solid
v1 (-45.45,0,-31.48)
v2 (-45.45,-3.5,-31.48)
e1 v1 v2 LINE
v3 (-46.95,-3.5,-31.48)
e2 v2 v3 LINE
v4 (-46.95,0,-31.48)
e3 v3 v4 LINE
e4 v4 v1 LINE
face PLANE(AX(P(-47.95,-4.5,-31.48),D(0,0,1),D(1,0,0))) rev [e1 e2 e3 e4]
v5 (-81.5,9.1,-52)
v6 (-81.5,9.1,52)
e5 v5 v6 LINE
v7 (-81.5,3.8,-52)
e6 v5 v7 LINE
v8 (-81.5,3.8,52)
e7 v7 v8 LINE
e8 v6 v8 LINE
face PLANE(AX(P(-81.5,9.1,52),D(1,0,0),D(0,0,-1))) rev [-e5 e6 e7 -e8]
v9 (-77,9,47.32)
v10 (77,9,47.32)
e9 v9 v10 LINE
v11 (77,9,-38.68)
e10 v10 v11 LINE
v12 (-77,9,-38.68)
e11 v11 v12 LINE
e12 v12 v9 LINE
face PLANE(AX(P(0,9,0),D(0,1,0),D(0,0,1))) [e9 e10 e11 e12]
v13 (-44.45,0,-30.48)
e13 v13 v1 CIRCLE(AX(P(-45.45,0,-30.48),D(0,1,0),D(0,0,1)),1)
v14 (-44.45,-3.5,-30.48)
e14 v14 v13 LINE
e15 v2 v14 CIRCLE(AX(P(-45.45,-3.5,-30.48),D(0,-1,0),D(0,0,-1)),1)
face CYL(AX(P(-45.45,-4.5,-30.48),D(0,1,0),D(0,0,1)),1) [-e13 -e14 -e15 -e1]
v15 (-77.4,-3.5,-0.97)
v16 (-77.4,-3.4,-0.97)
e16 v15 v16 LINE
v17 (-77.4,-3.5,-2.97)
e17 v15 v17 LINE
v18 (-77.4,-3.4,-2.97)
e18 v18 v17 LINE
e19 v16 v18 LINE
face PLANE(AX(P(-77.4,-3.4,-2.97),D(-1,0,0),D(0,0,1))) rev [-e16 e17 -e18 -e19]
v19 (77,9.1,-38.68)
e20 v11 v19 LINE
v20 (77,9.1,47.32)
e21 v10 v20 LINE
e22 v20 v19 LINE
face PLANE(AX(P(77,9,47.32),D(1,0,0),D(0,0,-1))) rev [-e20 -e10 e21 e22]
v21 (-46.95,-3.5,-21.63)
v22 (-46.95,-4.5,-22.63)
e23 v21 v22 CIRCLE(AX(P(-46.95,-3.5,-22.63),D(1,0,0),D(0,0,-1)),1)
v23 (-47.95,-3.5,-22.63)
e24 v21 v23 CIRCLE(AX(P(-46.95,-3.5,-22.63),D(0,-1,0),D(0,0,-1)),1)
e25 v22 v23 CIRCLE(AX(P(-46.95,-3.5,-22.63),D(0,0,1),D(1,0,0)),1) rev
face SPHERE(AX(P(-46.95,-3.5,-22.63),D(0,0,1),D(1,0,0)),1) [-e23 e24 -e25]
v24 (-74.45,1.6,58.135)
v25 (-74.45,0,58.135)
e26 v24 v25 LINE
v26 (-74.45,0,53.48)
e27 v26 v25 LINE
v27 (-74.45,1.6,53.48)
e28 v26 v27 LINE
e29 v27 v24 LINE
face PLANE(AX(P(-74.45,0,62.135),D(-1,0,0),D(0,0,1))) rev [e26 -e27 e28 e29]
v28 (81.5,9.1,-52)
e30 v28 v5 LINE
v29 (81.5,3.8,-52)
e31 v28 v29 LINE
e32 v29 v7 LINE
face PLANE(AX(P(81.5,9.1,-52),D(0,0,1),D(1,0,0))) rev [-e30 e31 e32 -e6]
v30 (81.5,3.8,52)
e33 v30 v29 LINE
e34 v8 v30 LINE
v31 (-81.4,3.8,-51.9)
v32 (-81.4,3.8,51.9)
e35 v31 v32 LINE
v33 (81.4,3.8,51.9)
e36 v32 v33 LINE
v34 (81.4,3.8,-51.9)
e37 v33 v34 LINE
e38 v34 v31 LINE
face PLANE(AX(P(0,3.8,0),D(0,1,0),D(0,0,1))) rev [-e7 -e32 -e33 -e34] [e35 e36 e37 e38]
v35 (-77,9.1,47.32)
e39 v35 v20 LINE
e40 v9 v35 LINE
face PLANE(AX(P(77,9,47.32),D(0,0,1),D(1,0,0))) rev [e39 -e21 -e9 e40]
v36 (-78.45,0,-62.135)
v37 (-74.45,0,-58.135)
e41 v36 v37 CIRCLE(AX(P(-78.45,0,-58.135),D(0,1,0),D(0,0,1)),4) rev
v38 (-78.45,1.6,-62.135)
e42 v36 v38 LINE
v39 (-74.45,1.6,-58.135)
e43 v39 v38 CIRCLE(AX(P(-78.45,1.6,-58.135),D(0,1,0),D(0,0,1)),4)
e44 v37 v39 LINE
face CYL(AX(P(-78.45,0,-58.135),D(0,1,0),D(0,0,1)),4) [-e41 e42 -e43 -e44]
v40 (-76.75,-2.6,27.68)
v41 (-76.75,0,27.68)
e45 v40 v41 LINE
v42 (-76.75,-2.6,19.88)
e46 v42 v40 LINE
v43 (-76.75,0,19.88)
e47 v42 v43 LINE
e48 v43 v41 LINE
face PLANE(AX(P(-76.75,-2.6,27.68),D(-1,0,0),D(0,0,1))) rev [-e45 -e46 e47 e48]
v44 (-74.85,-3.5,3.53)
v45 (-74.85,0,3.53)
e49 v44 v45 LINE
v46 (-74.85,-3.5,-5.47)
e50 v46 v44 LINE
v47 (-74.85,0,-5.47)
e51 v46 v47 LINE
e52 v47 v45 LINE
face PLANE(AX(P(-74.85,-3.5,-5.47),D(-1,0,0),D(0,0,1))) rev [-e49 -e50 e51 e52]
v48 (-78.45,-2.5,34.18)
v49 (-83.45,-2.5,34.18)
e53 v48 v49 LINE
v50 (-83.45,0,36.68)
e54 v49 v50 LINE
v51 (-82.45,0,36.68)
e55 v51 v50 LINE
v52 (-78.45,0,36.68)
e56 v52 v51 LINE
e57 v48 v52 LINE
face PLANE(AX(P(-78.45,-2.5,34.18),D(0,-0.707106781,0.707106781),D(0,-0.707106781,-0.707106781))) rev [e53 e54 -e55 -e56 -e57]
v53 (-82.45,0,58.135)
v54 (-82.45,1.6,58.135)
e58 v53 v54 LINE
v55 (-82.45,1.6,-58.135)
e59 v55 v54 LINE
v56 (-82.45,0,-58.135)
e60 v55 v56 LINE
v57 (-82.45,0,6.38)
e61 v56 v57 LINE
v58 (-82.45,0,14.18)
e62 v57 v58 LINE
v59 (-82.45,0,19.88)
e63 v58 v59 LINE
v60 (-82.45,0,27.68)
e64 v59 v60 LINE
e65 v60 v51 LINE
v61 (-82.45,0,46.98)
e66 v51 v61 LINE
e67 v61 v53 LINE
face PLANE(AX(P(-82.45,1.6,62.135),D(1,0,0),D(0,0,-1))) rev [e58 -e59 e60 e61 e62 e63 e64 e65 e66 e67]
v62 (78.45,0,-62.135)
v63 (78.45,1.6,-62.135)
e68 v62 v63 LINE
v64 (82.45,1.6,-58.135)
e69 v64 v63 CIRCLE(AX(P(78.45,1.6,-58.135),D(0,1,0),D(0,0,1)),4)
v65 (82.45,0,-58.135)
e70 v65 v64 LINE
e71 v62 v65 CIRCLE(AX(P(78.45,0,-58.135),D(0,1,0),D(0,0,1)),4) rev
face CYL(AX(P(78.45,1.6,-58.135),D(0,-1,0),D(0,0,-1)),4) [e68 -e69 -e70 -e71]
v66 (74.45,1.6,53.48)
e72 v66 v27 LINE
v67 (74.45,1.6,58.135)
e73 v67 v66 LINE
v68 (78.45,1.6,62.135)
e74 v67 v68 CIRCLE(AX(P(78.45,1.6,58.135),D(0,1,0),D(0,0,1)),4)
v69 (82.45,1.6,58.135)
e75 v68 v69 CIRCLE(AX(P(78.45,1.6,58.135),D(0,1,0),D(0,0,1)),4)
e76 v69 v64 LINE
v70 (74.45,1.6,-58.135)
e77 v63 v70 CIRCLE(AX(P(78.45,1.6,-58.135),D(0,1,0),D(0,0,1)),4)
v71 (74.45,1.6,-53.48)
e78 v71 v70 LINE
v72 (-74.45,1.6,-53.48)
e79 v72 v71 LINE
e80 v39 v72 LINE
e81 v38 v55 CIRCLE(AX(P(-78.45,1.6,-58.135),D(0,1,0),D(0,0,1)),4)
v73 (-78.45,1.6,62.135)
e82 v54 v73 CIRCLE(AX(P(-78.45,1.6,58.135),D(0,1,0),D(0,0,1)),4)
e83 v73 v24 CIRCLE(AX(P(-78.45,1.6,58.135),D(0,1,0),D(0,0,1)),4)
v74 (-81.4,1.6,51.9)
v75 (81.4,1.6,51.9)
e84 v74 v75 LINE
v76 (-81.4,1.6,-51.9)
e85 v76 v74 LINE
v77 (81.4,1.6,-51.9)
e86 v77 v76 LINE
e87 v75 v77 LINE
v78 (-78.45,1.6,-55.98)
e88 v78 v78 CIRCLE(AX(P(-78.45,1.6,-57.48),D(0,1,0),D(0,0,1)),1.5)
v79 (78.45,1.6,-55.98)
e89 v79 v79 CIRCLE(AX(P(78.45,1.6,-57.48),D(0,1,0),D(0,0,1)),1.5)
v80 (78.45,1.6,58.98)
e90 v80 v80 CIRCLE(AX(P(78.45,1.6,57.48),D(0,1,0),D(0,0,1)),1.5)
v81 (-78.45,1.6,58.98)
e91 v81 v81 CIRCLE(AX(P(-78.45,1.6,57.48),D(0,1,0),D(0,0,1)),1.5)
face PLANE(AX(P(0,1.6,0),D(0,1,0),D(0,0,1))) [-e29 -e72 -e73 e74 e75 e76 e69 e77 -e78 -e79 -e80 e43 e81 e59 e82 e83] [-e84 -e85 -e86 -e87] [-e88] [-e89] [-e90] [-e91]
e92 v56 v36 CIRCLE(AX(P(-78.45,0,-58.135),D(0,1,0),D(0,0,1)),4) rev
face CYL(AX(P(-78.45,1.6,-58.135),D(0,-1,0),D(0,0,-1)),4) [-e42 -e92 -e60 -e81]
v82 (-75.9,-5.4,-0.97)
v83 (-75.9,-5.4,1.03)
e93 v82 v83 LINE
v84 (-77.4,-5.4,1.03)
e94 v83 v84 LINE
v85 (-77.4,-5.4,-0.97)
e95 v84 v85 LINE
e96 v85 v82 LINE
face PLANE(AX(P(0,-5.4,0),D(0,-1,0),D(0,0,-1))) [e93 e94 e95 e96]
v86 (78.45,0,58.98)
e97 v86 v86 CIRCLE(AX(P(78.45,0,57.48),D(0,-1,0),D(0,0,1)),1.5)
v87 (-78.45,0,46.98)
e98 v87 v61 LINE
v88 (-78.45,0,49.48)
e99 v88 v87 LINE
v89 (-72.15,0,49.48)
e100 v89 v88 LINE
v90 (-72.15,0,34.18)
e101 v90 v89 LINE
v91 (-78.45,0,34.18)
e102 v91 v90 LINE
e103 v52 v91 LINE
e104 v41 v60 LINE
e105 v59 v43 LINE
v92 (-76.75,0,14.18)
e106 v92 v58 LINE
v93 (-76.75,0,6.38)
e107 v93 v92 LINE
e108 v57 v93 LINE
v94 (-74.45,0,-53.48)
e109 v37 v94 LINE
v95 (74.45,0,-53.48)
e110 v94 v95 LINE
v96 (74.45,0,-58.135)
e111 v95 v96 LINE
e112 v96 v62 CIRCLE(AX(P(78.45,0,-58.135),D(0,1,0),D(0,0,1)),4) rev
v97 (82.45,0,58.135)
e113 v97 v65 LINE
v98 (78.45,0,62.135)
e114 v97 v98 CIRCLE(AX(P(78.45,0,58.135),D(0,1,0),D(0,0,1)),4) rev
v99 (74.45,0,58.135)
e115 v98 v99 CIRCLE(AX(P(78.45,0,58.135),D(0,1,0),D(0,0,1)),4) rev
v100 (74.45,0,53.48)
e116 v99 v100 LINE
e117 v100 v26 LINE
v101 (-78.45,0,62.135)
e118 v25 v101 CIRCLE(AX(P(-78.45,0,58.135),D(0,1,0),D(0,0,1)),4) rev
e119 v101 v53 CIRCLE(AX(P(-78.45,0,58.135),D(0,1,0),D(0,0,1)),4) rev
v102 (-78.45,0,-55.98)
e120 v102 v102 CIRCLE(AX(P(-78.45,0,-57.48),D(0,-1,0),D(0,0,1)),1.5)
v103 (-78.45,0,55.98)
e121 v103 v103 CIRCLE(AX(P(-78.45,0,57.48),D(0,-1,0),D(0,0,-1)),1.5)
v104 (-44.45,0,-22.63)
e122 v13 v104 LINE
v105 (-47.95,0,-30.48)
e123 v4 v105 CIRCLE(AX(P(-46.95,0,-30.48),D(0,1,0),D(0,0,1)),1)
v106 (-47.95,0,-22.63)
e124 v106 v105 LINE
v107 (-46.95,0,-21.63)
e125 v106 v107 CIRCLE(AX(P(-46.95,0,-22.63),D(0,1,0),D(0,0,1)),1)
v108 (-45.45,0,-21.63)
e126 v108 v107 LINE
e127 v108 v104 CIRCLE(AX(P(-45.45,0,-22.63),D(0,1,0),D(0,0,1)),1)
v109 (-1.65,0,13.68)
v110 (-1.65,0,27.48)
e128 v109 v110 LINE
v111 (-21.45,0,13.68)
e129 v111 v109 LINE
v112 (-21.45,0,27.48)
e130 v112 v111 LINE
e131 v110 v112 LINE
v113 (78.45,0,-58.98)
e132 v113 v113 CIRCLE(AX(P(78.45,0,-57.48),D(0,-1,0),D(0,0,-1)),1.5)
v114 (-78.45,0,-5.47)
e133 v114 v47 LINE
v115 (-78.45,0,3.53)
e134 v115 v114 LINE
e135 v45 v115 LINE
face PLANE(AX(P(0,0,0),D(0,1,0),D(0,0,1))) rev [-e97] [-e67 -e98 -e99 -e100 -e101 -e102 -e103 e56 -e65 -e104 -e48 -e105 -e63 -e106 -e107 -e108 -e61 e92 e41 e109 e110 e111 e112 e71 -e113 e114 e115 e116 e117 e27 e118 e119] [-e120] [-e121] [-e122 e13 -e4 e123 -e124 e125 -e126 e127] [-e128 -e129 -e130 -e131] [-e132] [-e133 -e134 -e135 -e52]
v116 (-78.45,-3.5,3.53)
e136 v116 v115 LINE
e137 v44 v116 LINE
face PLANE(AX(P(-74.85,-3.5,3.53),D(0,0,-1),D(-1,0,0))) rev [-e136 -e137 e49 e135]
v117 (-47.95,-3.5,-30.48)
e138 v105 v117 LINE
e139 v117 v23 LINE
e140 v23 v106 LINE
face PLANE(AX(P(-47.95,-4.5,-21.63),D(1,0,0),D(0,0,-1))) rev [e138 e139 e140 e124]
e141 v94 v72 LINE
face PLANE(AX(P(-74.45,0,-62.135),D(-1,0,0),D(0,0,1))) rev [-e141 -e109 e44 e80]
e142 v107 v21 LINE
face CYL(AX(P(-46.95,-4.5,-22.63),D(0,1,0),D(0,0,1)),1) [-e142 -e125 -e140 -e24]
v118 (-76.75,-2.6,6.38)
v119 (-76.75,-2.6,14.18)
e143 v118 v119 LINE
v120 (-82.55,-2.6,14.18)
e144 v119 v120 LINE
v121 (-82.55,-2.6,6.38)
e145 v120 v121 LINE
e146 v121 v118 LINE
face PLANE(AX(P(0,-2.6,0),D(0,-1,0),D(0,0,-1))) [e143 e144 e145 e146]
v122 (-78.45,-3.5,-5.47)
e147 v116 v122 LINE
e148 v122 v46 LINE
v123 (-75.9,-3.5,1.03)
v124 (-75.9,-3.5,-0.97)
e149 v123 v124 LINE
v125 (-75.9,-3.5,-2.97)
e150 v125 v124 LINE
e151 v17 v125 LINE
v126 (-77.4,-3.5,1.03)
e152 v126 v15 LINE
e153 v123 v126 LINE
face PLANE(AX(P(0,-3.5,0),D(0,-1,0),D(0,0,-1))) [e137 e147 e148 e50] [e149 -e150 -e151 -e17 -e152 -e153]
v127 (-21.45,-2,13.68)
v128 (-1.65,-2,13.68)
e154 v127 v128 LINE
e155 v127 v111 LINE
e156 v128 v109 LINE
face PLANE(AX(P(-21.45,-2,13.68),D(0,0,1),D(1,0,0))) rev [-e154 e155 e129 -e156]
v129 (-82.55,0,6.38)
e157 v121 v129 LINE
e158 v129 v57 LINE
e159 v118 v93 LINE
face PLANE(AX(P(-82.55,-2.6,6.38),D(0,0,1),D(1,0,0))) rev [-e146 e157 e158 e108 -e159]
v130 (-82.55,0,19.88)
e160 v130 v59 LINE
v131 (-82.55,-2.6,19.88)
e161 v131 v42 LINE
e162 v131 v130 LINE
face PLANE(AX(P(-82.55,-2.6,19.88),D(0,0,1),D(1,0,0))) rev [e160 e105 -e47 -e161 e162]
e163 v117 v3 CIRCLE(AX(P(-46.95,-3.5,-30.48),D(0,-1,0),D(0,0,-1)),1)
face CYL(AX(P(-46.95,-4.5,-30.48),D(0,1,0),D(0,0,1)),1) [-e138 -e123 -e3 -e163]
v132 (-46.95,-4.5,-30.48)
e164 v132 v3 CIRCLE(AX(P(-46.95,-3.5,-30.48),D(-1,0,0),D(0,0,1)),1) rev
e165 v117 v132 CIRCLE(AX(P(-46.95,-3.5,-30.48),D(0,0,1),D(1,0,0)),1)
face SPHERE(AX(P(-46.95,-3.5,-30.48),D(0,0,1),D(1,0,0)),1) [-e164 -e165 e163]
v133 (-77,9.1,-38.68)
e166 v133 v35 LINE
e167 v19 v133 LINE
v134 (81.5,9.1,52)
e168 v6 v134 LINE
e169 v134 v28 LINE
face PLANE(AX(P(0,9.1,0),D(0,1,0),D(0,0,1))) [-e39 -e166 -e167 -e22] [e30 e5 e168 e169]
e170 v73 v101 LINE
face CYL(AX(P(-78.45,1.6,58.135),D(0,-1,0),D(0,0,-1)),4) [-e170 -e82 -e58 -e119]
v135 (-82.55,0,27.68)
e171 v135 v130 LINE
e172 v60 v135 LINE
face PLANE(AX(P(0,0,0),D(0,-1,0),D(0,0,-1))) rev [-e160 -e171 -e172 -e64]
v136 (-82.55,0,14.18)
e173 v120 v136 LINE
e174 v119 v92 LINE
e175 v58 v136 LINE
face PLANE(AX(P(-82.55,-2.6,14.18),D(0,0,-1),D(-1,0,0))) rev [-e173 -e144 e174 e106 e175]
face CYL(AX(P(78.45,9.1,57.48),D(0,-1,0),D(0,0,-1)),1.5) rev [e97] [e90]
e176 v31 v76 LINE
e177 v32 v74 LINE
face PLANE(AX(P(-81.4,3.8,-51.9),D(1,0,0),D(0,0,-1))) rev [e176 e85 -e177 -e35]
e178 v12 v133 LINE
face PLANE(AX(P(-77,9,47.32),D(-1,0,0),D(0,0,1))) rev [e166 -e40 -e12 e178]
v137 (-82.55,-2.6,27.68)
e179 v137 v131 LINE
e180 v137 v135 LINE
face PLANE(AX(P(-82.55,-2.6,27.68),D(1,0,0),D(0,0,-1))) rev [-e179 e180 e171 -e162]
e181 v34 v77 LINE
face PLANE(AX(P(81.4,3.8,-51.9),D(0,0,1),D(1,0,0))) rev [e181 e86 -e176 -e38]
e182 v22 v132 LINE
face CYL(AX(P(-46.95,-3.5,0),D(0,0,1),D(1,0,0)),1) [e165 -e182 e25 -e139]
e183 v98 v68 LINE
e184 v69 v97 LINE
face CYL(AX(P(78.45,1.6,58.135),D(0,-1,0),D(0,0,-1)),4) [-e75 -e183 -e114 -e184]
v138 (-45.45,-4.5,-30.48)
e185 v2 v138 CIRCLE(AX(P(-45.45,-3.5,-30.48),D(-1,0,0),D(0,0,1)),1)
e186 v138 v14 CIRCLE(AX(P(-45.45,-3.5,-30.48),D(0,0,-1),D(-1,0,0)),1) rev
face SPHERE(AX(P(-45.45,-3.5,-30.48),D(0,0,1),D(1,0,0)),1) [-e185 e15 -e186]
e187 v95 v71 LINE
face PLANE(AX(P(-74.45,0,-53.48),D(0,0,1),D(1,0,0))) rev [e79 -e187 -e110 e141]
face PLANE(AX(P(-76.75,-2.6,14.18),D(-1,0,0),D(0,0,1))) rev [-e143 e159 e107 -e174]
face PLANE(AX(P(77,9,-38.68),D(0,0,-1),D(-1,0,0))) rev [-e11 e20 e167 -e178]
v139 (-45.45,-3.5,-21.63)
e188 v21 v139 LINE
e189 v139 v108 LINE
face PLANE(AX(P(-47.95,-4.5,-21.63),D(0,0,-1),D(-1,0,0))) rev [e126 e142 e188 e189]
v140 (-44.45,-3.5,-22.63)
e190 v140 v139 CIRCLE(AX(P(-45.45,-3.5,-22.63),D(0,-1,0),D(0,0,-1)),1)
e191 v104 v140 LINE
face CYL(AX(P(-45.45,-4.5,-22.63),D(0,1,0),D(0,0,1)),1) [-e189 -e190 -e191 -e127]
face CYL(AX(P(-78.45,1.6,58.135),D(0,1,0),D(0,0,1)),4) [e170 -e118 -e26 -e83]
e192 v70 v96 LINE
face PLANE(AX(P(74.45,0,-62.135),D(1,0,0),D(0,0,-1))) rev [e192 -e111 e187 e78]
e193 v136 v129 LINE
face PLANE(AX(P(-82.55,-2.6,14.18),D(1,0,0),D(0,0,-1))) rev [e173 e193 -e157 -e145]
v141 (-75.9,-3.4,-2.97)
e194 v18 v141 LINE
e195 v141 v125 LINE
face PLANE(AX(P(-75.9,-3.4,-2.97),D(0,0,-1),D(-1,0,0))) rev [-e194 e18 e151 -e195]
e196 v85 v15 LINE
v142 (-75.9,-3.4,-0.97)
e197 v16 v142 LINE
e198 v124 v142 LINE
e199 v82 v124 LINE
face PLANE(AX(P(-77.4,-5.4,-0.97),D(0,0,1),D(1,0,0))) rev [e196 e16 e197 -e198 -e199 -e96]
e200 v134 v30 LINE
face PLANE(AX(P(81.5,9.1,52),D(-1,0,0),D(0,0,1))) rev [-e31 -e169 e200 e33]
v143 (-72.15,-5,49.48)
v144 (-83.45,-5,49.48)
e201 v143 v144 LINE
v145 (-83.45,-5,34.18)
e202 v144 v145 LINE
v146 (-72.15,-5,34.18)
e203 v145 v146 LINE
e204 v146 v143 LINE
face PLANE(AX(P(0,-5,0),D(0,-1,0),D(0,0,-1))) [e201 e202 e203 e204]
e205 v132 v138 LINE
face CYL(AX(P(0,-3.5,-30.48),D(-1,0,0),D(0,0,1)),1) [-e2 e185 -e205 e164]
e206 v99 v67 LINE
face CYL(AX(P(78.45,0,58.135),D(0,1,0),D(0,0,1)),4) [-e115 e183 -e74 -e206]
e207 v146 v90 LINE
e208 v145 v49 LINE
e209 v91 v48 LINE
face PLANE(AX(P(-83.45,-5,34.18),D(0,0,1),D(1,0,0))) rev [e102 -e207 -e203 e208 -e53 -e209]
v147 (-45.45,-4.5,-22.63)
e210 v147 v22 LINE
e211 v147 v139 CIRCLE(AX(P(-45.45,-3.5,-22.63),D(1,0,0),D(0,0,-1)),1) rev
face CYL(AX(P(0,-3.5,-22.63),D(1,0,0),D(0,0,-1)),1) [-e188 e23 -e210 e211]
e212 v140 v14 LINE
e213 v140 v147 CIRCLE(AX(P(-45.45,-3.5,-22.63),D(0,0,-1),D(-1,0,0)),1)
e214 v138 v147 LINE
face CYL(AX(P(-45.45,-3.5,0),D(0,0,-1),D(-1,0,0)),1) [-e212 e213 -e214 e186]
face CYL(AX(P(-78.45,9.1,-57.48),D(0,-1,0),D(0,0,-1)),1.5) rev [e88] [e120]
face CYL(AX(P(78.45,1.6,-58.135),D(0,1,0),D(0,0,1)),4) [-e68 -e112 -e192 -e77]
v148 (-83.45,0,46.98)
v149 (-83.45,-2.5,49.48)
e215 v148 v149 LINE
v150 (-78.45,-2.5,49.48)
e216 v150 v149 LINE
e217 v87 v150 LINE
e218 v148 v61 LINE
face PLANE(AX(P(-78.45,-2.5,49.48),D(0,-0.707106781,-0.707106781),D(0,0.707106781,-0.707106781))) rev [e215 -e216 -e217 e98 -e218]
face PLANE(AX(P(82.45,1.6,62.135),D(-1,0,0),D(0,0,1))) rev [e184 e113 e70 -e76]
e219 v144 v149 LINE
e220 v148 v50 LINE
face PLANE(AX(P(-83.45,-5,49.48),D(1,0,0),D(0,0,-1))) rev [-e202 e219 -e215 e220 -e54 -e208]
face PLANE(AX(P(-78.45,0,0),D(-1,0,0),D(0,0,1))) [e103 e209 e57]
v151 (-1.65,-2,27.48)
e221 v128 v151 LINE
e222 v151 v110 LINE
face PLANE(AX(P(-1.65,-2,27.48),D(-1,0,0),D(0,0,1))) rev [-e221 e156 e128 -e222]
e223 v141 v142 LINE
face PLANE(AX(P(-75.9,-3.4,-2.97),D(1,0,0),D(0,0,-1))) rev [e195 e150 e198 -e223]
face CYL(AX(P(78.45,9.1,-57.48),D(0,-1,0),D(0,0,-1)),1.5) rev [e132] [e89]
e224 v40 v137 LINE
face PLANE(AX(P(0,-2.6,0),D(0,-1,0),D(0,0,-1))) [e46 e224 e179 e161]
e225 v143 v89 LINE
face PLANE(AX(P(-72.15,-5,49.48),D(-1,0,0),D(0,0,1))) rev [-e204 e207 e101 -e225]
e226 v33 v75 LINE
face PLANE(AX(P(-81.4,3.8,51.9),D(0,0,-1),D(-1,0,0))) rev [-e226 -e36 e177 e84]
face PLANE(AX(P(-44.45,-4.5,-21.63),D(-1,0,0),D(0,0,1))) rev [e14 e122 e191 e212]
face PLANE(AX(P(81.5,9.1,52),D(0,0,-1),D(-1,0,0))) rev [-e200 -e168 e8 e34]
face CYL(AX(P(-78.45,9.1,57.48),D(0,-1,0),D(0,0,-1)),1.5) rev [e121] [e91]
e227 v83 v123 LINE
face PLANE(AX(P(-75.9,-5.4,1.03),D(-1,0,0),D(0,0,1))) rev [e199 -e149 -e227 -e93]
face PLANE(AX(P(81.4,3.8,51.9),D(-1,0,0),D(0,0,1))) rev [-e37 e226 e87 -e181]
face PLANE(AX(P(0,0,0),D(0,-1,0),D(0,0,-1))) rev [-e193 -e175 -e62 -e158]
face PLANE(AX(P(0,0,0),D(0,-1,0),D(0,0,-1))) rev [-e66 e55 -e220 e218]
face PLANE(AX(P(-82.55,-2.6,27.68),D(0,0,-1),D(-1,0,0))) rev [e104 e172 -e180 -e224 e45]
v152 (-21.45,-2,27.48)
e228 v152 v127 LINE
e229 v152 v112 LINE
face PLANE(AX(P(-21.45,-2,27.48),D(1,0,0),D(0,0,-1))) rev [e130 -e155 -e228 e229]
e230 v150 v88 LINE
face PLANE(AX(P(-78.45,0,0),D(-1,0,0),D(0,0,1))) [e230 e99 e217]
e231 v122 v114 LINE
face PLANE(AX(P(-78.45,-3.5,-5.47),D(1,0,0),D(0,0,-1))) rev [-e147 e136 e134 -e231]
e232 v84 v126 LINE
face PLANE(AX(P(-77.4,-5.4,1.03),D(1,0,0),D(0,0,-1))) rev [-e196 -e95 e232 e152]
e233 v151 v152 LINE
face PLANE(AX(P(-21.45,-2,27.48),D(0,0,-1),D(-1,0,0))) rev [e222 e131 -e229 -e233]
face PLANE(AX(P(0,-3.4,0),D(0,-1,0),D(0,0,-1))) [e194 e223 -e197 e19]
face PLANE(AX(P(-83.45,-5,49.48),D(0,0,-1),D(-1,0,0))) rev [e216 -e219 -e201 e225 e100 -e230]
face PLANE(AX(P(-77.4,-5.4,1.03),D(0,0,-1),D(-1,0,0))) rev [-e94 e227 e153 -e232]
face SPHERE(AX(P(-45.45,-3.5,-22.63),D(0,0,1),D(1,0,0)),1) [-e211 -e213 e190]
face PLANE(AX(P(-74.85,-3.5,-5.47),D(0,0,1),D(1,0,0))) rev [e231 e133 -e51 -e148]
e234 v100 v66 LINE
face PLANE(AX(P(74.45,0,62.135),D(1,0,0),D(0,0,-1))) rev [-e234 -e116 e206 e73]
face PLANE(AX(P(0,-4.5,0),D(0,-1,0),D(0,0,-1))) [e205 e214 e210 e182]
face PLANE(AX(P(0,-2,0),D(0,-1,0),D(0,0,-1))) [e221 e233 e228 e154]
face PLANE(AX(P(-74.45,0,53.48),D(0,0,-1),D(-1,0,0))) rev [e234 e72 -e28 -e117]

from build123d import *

# Parameters (mm, degrees)
SKETCH_1_W          = 164.9
SKETCH_1_H          = 124.27
EXTRUDE_2_DEPTH     = 1.6
SKETCH_2_W          = 148.9
SKETCH_2_H          = 8.655
CUT_EXTRUDE_1_DEPTH = 104.253671726
SKETCH_3_W          = 163
SKETCH_3_H          = 104
EXTRUDE_4_DEPTH     = 7.5
SKETCH_4_W          = 11.3
SKETCH_4_H          = 15.3
EXTRUDE_5_DEPTH     = 5
SKETCH_6_W          = 3.5
SKETCH_6_H          = 9.85
EXTRUDE_6_DEPTH     = 4.5
FILLET_1_R          = 1
FILLET_2_R          = 1
SKETCH_7_R          = 1.5
CUT_EXTRUDE_3_DEPTH = 105.438837245
FILLET_3_R          = 4
SKETCH_9_W          = 154
SKETCH_9_H          = 86
CUT_EXTRUDE_5_DEPTH = 0.1
CUT_EXTRUDE_6_DEPTH = 5
SKETCH_11_W         = 5.8
SKETCH_11_H         = 7.8
EXTRUDE_7_DEPTH     = 2.6
SKETCH_12_W         = 3.6
SKETCH_12_H         = 9
EXTRUDE_8_DEPTH     = 3.5
SKETCH_13_W         = 1.5
SKETCH_13_H         = 4
CUT_EXTRUDE_7_DEPTH = 0.1
SKETCH_14_W         = 1.5
SKETCH_14_H         = 2
EXTRUDE_9_DEPTH     = 2
SKETCH_15_W         = 19.8
SKETCH_15_H         = 13.8
EXTRUDE_10_DEPTH    = 2
SKETCH_16_W         = 163
SKETCH_16_H         = 104
SKETCH_16_W_2       = 162.8
SKETCH_16_H_2       = 103.8
CUT_EXTRUDE_9_DEPTH = 2.2


# Some blends are built 0.0001 mm under size
with BuildPart() as part:
    # 草图1 → 凸台-拉伸2 (new body)
    with BuildSketch(Plane(origin=(0, 0, 0), x_dir=(1, 0, 0), z_dir=(0, 1, 0))):
        Rectangle(SKETCH_1_W, SKETCH_1_H)
    extrude(amount=EXTRUDE_2_DEPTH)

    # 草图2 → 切除-拉伸1 (cut, through all)
    with BuildSketch(Plane(origin=(0, 1.6, 0), x_dir=(1, 0, 0), z_dir=(0, 1, 0))):
        with Locations((0, 57.8075)):
            Rectangle(SKETCH_2_W, SKETCH_2_H)
        with Locations((0, -57.8075)):
            Rectangle(SKETCH_2_W, SKETCH_2_H)
    extrude(amount=-CUT_EXTRUDE_1_DEPTH, mode=Mode.SUBTRACT)

    # 草图3 → 凸台-拉伸4 (add)
    with BuildSketch(Plane(origin=(0, 1.6, 0), x_dir=(1, 0, 0), z_dir=(0, 1, 0))):
        Rectangle(SKETCH_3_W, SKETCH_3_H)
    extrude(amount=EXTRUDE_4_DEPTH)

    # 草图4 → 凸台-拉伸5 (add)
    with BuildSketch(Plane.XZ):
        with Locations((-77.8, 41.83)):
            Rectangle(SKETCH_4_W, SKETCH_4_H)
    extrude(amount=EXTRUDE_5_DEPTH)

    # 草图6 → 凸台-拉伸6 (add)
    with BuildSketch(Plane(origin=(0, 0, 0), x_dir=(-1, 0, 0), z_dir=(0, -1, 0))):
        with Locations((46.2, 26.555)):
            Rectangle(SKETCH_6_W, SKETCH_6_H)
    extrude(amount=EXTRUDE_6_DEPTH)

    # 圆角1
    fillet_1_edges = [part.edges().sort_by_distance(p)[0] for p in [
        (-44.45, -4.5, -26.555),
        (-46.2, -4.5, -21.63),
        (-47.95, -4.5, -26.555),
        (-46.2, -4.5, -31.48),
    ]]
    fillet(fillet_1_edges, radius=FILLET_1_R)

    # 圆角2
    # the kernel refuses this fillet: 1 mm, written as the material it takes off along each edge
    with BuildSketch(Plane(origin=(-46.95, -3.5, -22.63), x_dir=(0, 0, 1), z_dir=(-1, 0, 0))) as fillet_2_piece_1_section:
        Polygon((0, 0), (FILLET_2_R, 0), (FILLET_2_R, -FILLET_2_R), (0, -FILLET_2_R), align=None)
    fillet_2_piece_1 = extrude(amount=FILLET_2_R, mode=Mode.PRIVATE)
    fillet_2_piece_1 = fillet_2_piece_1 - Plane(origin=(-46.95, -3.5, -22.63), x_dir=(0, 0.7071067811865475, -0.7071067811865475), z_dir=(-1, 0, 0)) * Sphere(FILLET_2_R, mode=Mode.PRIVATE)
    add(fillet_2_piece_1, mode=Mode.SUBTRACT)
    with BuildSketch(Plane(origin=(-45.45, -3.5, -22.63), x_dir=(1, 0, 0), z_dir=(0, 0, 1))) as fillet_2_piece_2_section:
        Polygon((0, 0), (FILLET_2_R, 0), (FILLET_2_R, -FILLET_2_R), (0, -FILLET_2_R), align=None)
    fillet_2_piece_2 = extrude(amount=FILLET_2_R, mode=Mode.PRIVATE)
    fillet_2_piece_2 = fillet_2_piece_2 - Plane(origin=(-45.45, -3.5, -22.63), x_dir=(-0.7071067811865475, 0.7071067811865475, 0), z_dir=(0, 0, 1)) * Sphere(FILLET_2_R, mode=Mode.PRIVATE)
    add(fillet_2_piece_2, mode=Mode.SUBTRACT)
    with BuildSketch(Plane(origin=(-46.95, -3.5, -30.48), x_dir=(0, 0, -1), z_dir=(-1, 0, 0))) as fillet_2_piece_3_section:
        Polygon((0, 0), (FILLET_2_R, 0), (FILLET_2_R, FILLET_2_R), (0, FILLET_2_R), align=None)
    fillet_2_piece_3 = extrude(amount=FILLET_2_R, mode=Mode.PRIVATE)
    fillet_2_piece_3 = fillet_2_piece_3 - Plane(origin=(-46.95, -3.5, -30.48), x_dir=(0, 0.7071067811865475, 0.7071067811865475), z_dir=(-1, 0, 0)) * Sphere(FILLET_2_R, mode=Mode.PRIVATE)
    add(fillet_2_piece_3, mode=Mode.SUBTRACT)
    with BuildSketch(Plane(origin=(-45.45, -3.5, -30.48), x_dir=(1, 0, 0), z_dir=(0, 0, -1))) as fillet_2_piece_4_section:
        Polygon((0, 0), (FILLET_2_R, 0), (FILLET_2_R, FILLET_2_R), (0, FILLET_2_R), align=None)
    fillet_2_piece_4 = extrude(amount=FILLET_2_R, mode=Mode.PRIVATE)
    fillet_2_piece_4 = fillet_2_piece_4 - Plane(origin=(-45.45, -3.5, -30.48), x_dir=(-0.7071067811865475, 0.7071067811865475, 0), z_dir=(0, 0, -1)) * Sphere(FILLET_2_R, mode=Mode.PRIVATE)
    add(fillet_2_piece_4, mode=Mode.SUBTRACT)
    with BuildSketch(Plane(origin=(-44.45, 0, -31.48), x_dir=(-1, 0, 0), z_dir=(0, -1, 0)), Plane(origin=(-47.95, 0, -31.48), x_dir=(0, 0, 1), z_dir=(0, -1, 0))) as fillet_2_piece_5:
        with BuildLine():
            CenterArc((FILLET_2_R, -FILLET_2_R), FILLET_2_R, 90, 90)
            Line((0, -FILLET_2_R), (0, 0))
            Line((0, 0), (FILLET_2_R, 0))
        make_face()
    extrude(amount=3.5, mode=Mode.SUBTRACT)
    with BuildSketch(Plane(origin=(-47.95, 0, -21.63), x_dir=(0, 0, -1), z_dir=(0, -1, 0)), Plane(origin=(-44.45, 0, -21.63), x_dir=(-1, 0, 0), z_dir=(0, -1, 0))) as fillet_2_piece_6:
        with BuildLine():
            CenterArc((FILLET_2_R, FILLET_2_R), FILLET_2_R, 180, 90)
            Line((0, FILLET_2_R), (0, 0))
            Line((0, 0), (FILLET_2_R, 0))
        make_face()
    extrude(amount=3.5, mode=Mode.SUBTRACT)

    # 草图7 → 切除-拉伸3 (cut, through all)
    with BuildSketch(Plane.XZ):
        with Locations(Location((-78.45, 57.48, 0), (0, 0, 270))):
            Circle(SKETCH_7_R)
        with Locations(Location((78.45, 57.48, 0), (0, 0, 90))):
            Circle(SKETCH_7_R)
        with Locations(Location((78.45, -57.48, 0), (0, 0, 270))):
            Circle(SKETCH_7_R)
        with Locations(Location((-78.45, -57.48, 0), (0, 0, 90))):
            Circle(SKETCH_7_R)
    extrude(amount=-CUT_EXTRUDE_3_DEPTH, mode=Mode.SUBTRACT)

    # 圆角3
    fillet_3_edges = [part.edges().sort_by_distance(p)[0] for p in [
        (-74.45, 0.8, -62.135),
        (-82.45, 0.8, -62.135),
        (82.45, 0.8, -62.135),
        (74.45, 0.8, -62.135),
        (74.45, 0.8, 62.135),
        (82.45, 0.8, 62.135),
        (-74.45, 0.8, 62.135),
        (-82.45, 0.8, 62.135),
    ]]
    fillet(fillet_3_edges, radius=FILLET_3_R - 0.0001)  # a hair under: the kernel refuses the full size

    # 草图9 → 切除-拉伸5 (cut)
    with BuildSketch(Plane(origin=(0, 9.1, 0), x_dir=(1, 0, 0), z_dir=(0, 1, 0))):
        with Locations((0, -4.32)):
            Rectangle(SKETCH_9_W, SKETCH_9_H)
    extrude(amount=-CUT_EXTRUDE_5_DEPTH, mode=Mode.SUBTRACT)

    # 草图10 → 切除-拉伸6 (cut)
    with BuildSketch(Plane.ZY.offset(83.45)):
        Polygon((49.48, -2.5), (46.98, 0), (49.48, 0), align=None)
        Polygon((34.18, 0), (34.18, -2.5), (36.68, 0), align=None)
    extrude(amount=-CUT_EXTRUDE_6_DEPTH, mode=Mode.SUBTRACT)

    # 草图11 → 凸台-拉伸7 (add)
    with BuildSketch(Plane.XZ):
        with Locations((-79.65, 23.78)):
            Rectangle(SKETCH_11_W, SKETCH_11_H)
        with Locations((-79.65, 10.28)):
            Rectangle(SKETCH_11_W, SKETCH_11_H)
    extrude(amount=EXTRUDE_7_DEPTH)

    # 草图12 → 凸台-拉伸8 (add)
    with BuildSketch(Plane.XZ):
        with Locations((-76.65, -0.97)):
            Rectangle(SKETCH_12_W, SKETCH_12_H)
    extrude(amount=EXTRUDE_8_DEPTH)

    # 草图13 → 切除-拉伸7 (cut)
    with BuildSketch(Plane.XZ.offset(3.5)):
        with Locations((-76.65, -0.97)):
            Rectangle(SKETCH_13_W, SKETCH_13_H)
    extrude(amount=-CUT_EXTRUDE_7_DEPTH, mode=Mode.SUBTRACT)

    # 草图14 → 凸台-拉伸9 (add)
    with BuildSketch(Plane.XZ.offset(3.4)):
        with Locations((-76.65, 0.03)):
            Rectangle(SKETCH_14_W, SKETCH_14_H)
    extrude(amount=EXTRUDE_9_DEPTH)

    # 草图15 → 凸台-拉伸10 (add)
    with BuildSketch(Plane.XZ):
        with Locations((-11.55, 20.58)):
            Rectangle(SKETCH_15_W, SKETCH_15_H)
    extrude(amount=EXTRUDE_10_DEPTH)

    # 草图16 → 切除-拉伸9 (cut)
    with BuildSketch(Plane(origin=(0, 1.6, 0), x_dir=(1, 0, 0), z_dir=(0, 1, 0))):
        Rectangle(SKETCH_16_W, SKETCH_16_H)
        Rectangle(SKETCH_16_W_2, SKETCH_16_H_2, mode=Mode.SUBTRACT)
    extrude(amount=CUT_EXTRUDE_9_DEPTH, mode=Mode.SUBTRACT)


solid = part.part
